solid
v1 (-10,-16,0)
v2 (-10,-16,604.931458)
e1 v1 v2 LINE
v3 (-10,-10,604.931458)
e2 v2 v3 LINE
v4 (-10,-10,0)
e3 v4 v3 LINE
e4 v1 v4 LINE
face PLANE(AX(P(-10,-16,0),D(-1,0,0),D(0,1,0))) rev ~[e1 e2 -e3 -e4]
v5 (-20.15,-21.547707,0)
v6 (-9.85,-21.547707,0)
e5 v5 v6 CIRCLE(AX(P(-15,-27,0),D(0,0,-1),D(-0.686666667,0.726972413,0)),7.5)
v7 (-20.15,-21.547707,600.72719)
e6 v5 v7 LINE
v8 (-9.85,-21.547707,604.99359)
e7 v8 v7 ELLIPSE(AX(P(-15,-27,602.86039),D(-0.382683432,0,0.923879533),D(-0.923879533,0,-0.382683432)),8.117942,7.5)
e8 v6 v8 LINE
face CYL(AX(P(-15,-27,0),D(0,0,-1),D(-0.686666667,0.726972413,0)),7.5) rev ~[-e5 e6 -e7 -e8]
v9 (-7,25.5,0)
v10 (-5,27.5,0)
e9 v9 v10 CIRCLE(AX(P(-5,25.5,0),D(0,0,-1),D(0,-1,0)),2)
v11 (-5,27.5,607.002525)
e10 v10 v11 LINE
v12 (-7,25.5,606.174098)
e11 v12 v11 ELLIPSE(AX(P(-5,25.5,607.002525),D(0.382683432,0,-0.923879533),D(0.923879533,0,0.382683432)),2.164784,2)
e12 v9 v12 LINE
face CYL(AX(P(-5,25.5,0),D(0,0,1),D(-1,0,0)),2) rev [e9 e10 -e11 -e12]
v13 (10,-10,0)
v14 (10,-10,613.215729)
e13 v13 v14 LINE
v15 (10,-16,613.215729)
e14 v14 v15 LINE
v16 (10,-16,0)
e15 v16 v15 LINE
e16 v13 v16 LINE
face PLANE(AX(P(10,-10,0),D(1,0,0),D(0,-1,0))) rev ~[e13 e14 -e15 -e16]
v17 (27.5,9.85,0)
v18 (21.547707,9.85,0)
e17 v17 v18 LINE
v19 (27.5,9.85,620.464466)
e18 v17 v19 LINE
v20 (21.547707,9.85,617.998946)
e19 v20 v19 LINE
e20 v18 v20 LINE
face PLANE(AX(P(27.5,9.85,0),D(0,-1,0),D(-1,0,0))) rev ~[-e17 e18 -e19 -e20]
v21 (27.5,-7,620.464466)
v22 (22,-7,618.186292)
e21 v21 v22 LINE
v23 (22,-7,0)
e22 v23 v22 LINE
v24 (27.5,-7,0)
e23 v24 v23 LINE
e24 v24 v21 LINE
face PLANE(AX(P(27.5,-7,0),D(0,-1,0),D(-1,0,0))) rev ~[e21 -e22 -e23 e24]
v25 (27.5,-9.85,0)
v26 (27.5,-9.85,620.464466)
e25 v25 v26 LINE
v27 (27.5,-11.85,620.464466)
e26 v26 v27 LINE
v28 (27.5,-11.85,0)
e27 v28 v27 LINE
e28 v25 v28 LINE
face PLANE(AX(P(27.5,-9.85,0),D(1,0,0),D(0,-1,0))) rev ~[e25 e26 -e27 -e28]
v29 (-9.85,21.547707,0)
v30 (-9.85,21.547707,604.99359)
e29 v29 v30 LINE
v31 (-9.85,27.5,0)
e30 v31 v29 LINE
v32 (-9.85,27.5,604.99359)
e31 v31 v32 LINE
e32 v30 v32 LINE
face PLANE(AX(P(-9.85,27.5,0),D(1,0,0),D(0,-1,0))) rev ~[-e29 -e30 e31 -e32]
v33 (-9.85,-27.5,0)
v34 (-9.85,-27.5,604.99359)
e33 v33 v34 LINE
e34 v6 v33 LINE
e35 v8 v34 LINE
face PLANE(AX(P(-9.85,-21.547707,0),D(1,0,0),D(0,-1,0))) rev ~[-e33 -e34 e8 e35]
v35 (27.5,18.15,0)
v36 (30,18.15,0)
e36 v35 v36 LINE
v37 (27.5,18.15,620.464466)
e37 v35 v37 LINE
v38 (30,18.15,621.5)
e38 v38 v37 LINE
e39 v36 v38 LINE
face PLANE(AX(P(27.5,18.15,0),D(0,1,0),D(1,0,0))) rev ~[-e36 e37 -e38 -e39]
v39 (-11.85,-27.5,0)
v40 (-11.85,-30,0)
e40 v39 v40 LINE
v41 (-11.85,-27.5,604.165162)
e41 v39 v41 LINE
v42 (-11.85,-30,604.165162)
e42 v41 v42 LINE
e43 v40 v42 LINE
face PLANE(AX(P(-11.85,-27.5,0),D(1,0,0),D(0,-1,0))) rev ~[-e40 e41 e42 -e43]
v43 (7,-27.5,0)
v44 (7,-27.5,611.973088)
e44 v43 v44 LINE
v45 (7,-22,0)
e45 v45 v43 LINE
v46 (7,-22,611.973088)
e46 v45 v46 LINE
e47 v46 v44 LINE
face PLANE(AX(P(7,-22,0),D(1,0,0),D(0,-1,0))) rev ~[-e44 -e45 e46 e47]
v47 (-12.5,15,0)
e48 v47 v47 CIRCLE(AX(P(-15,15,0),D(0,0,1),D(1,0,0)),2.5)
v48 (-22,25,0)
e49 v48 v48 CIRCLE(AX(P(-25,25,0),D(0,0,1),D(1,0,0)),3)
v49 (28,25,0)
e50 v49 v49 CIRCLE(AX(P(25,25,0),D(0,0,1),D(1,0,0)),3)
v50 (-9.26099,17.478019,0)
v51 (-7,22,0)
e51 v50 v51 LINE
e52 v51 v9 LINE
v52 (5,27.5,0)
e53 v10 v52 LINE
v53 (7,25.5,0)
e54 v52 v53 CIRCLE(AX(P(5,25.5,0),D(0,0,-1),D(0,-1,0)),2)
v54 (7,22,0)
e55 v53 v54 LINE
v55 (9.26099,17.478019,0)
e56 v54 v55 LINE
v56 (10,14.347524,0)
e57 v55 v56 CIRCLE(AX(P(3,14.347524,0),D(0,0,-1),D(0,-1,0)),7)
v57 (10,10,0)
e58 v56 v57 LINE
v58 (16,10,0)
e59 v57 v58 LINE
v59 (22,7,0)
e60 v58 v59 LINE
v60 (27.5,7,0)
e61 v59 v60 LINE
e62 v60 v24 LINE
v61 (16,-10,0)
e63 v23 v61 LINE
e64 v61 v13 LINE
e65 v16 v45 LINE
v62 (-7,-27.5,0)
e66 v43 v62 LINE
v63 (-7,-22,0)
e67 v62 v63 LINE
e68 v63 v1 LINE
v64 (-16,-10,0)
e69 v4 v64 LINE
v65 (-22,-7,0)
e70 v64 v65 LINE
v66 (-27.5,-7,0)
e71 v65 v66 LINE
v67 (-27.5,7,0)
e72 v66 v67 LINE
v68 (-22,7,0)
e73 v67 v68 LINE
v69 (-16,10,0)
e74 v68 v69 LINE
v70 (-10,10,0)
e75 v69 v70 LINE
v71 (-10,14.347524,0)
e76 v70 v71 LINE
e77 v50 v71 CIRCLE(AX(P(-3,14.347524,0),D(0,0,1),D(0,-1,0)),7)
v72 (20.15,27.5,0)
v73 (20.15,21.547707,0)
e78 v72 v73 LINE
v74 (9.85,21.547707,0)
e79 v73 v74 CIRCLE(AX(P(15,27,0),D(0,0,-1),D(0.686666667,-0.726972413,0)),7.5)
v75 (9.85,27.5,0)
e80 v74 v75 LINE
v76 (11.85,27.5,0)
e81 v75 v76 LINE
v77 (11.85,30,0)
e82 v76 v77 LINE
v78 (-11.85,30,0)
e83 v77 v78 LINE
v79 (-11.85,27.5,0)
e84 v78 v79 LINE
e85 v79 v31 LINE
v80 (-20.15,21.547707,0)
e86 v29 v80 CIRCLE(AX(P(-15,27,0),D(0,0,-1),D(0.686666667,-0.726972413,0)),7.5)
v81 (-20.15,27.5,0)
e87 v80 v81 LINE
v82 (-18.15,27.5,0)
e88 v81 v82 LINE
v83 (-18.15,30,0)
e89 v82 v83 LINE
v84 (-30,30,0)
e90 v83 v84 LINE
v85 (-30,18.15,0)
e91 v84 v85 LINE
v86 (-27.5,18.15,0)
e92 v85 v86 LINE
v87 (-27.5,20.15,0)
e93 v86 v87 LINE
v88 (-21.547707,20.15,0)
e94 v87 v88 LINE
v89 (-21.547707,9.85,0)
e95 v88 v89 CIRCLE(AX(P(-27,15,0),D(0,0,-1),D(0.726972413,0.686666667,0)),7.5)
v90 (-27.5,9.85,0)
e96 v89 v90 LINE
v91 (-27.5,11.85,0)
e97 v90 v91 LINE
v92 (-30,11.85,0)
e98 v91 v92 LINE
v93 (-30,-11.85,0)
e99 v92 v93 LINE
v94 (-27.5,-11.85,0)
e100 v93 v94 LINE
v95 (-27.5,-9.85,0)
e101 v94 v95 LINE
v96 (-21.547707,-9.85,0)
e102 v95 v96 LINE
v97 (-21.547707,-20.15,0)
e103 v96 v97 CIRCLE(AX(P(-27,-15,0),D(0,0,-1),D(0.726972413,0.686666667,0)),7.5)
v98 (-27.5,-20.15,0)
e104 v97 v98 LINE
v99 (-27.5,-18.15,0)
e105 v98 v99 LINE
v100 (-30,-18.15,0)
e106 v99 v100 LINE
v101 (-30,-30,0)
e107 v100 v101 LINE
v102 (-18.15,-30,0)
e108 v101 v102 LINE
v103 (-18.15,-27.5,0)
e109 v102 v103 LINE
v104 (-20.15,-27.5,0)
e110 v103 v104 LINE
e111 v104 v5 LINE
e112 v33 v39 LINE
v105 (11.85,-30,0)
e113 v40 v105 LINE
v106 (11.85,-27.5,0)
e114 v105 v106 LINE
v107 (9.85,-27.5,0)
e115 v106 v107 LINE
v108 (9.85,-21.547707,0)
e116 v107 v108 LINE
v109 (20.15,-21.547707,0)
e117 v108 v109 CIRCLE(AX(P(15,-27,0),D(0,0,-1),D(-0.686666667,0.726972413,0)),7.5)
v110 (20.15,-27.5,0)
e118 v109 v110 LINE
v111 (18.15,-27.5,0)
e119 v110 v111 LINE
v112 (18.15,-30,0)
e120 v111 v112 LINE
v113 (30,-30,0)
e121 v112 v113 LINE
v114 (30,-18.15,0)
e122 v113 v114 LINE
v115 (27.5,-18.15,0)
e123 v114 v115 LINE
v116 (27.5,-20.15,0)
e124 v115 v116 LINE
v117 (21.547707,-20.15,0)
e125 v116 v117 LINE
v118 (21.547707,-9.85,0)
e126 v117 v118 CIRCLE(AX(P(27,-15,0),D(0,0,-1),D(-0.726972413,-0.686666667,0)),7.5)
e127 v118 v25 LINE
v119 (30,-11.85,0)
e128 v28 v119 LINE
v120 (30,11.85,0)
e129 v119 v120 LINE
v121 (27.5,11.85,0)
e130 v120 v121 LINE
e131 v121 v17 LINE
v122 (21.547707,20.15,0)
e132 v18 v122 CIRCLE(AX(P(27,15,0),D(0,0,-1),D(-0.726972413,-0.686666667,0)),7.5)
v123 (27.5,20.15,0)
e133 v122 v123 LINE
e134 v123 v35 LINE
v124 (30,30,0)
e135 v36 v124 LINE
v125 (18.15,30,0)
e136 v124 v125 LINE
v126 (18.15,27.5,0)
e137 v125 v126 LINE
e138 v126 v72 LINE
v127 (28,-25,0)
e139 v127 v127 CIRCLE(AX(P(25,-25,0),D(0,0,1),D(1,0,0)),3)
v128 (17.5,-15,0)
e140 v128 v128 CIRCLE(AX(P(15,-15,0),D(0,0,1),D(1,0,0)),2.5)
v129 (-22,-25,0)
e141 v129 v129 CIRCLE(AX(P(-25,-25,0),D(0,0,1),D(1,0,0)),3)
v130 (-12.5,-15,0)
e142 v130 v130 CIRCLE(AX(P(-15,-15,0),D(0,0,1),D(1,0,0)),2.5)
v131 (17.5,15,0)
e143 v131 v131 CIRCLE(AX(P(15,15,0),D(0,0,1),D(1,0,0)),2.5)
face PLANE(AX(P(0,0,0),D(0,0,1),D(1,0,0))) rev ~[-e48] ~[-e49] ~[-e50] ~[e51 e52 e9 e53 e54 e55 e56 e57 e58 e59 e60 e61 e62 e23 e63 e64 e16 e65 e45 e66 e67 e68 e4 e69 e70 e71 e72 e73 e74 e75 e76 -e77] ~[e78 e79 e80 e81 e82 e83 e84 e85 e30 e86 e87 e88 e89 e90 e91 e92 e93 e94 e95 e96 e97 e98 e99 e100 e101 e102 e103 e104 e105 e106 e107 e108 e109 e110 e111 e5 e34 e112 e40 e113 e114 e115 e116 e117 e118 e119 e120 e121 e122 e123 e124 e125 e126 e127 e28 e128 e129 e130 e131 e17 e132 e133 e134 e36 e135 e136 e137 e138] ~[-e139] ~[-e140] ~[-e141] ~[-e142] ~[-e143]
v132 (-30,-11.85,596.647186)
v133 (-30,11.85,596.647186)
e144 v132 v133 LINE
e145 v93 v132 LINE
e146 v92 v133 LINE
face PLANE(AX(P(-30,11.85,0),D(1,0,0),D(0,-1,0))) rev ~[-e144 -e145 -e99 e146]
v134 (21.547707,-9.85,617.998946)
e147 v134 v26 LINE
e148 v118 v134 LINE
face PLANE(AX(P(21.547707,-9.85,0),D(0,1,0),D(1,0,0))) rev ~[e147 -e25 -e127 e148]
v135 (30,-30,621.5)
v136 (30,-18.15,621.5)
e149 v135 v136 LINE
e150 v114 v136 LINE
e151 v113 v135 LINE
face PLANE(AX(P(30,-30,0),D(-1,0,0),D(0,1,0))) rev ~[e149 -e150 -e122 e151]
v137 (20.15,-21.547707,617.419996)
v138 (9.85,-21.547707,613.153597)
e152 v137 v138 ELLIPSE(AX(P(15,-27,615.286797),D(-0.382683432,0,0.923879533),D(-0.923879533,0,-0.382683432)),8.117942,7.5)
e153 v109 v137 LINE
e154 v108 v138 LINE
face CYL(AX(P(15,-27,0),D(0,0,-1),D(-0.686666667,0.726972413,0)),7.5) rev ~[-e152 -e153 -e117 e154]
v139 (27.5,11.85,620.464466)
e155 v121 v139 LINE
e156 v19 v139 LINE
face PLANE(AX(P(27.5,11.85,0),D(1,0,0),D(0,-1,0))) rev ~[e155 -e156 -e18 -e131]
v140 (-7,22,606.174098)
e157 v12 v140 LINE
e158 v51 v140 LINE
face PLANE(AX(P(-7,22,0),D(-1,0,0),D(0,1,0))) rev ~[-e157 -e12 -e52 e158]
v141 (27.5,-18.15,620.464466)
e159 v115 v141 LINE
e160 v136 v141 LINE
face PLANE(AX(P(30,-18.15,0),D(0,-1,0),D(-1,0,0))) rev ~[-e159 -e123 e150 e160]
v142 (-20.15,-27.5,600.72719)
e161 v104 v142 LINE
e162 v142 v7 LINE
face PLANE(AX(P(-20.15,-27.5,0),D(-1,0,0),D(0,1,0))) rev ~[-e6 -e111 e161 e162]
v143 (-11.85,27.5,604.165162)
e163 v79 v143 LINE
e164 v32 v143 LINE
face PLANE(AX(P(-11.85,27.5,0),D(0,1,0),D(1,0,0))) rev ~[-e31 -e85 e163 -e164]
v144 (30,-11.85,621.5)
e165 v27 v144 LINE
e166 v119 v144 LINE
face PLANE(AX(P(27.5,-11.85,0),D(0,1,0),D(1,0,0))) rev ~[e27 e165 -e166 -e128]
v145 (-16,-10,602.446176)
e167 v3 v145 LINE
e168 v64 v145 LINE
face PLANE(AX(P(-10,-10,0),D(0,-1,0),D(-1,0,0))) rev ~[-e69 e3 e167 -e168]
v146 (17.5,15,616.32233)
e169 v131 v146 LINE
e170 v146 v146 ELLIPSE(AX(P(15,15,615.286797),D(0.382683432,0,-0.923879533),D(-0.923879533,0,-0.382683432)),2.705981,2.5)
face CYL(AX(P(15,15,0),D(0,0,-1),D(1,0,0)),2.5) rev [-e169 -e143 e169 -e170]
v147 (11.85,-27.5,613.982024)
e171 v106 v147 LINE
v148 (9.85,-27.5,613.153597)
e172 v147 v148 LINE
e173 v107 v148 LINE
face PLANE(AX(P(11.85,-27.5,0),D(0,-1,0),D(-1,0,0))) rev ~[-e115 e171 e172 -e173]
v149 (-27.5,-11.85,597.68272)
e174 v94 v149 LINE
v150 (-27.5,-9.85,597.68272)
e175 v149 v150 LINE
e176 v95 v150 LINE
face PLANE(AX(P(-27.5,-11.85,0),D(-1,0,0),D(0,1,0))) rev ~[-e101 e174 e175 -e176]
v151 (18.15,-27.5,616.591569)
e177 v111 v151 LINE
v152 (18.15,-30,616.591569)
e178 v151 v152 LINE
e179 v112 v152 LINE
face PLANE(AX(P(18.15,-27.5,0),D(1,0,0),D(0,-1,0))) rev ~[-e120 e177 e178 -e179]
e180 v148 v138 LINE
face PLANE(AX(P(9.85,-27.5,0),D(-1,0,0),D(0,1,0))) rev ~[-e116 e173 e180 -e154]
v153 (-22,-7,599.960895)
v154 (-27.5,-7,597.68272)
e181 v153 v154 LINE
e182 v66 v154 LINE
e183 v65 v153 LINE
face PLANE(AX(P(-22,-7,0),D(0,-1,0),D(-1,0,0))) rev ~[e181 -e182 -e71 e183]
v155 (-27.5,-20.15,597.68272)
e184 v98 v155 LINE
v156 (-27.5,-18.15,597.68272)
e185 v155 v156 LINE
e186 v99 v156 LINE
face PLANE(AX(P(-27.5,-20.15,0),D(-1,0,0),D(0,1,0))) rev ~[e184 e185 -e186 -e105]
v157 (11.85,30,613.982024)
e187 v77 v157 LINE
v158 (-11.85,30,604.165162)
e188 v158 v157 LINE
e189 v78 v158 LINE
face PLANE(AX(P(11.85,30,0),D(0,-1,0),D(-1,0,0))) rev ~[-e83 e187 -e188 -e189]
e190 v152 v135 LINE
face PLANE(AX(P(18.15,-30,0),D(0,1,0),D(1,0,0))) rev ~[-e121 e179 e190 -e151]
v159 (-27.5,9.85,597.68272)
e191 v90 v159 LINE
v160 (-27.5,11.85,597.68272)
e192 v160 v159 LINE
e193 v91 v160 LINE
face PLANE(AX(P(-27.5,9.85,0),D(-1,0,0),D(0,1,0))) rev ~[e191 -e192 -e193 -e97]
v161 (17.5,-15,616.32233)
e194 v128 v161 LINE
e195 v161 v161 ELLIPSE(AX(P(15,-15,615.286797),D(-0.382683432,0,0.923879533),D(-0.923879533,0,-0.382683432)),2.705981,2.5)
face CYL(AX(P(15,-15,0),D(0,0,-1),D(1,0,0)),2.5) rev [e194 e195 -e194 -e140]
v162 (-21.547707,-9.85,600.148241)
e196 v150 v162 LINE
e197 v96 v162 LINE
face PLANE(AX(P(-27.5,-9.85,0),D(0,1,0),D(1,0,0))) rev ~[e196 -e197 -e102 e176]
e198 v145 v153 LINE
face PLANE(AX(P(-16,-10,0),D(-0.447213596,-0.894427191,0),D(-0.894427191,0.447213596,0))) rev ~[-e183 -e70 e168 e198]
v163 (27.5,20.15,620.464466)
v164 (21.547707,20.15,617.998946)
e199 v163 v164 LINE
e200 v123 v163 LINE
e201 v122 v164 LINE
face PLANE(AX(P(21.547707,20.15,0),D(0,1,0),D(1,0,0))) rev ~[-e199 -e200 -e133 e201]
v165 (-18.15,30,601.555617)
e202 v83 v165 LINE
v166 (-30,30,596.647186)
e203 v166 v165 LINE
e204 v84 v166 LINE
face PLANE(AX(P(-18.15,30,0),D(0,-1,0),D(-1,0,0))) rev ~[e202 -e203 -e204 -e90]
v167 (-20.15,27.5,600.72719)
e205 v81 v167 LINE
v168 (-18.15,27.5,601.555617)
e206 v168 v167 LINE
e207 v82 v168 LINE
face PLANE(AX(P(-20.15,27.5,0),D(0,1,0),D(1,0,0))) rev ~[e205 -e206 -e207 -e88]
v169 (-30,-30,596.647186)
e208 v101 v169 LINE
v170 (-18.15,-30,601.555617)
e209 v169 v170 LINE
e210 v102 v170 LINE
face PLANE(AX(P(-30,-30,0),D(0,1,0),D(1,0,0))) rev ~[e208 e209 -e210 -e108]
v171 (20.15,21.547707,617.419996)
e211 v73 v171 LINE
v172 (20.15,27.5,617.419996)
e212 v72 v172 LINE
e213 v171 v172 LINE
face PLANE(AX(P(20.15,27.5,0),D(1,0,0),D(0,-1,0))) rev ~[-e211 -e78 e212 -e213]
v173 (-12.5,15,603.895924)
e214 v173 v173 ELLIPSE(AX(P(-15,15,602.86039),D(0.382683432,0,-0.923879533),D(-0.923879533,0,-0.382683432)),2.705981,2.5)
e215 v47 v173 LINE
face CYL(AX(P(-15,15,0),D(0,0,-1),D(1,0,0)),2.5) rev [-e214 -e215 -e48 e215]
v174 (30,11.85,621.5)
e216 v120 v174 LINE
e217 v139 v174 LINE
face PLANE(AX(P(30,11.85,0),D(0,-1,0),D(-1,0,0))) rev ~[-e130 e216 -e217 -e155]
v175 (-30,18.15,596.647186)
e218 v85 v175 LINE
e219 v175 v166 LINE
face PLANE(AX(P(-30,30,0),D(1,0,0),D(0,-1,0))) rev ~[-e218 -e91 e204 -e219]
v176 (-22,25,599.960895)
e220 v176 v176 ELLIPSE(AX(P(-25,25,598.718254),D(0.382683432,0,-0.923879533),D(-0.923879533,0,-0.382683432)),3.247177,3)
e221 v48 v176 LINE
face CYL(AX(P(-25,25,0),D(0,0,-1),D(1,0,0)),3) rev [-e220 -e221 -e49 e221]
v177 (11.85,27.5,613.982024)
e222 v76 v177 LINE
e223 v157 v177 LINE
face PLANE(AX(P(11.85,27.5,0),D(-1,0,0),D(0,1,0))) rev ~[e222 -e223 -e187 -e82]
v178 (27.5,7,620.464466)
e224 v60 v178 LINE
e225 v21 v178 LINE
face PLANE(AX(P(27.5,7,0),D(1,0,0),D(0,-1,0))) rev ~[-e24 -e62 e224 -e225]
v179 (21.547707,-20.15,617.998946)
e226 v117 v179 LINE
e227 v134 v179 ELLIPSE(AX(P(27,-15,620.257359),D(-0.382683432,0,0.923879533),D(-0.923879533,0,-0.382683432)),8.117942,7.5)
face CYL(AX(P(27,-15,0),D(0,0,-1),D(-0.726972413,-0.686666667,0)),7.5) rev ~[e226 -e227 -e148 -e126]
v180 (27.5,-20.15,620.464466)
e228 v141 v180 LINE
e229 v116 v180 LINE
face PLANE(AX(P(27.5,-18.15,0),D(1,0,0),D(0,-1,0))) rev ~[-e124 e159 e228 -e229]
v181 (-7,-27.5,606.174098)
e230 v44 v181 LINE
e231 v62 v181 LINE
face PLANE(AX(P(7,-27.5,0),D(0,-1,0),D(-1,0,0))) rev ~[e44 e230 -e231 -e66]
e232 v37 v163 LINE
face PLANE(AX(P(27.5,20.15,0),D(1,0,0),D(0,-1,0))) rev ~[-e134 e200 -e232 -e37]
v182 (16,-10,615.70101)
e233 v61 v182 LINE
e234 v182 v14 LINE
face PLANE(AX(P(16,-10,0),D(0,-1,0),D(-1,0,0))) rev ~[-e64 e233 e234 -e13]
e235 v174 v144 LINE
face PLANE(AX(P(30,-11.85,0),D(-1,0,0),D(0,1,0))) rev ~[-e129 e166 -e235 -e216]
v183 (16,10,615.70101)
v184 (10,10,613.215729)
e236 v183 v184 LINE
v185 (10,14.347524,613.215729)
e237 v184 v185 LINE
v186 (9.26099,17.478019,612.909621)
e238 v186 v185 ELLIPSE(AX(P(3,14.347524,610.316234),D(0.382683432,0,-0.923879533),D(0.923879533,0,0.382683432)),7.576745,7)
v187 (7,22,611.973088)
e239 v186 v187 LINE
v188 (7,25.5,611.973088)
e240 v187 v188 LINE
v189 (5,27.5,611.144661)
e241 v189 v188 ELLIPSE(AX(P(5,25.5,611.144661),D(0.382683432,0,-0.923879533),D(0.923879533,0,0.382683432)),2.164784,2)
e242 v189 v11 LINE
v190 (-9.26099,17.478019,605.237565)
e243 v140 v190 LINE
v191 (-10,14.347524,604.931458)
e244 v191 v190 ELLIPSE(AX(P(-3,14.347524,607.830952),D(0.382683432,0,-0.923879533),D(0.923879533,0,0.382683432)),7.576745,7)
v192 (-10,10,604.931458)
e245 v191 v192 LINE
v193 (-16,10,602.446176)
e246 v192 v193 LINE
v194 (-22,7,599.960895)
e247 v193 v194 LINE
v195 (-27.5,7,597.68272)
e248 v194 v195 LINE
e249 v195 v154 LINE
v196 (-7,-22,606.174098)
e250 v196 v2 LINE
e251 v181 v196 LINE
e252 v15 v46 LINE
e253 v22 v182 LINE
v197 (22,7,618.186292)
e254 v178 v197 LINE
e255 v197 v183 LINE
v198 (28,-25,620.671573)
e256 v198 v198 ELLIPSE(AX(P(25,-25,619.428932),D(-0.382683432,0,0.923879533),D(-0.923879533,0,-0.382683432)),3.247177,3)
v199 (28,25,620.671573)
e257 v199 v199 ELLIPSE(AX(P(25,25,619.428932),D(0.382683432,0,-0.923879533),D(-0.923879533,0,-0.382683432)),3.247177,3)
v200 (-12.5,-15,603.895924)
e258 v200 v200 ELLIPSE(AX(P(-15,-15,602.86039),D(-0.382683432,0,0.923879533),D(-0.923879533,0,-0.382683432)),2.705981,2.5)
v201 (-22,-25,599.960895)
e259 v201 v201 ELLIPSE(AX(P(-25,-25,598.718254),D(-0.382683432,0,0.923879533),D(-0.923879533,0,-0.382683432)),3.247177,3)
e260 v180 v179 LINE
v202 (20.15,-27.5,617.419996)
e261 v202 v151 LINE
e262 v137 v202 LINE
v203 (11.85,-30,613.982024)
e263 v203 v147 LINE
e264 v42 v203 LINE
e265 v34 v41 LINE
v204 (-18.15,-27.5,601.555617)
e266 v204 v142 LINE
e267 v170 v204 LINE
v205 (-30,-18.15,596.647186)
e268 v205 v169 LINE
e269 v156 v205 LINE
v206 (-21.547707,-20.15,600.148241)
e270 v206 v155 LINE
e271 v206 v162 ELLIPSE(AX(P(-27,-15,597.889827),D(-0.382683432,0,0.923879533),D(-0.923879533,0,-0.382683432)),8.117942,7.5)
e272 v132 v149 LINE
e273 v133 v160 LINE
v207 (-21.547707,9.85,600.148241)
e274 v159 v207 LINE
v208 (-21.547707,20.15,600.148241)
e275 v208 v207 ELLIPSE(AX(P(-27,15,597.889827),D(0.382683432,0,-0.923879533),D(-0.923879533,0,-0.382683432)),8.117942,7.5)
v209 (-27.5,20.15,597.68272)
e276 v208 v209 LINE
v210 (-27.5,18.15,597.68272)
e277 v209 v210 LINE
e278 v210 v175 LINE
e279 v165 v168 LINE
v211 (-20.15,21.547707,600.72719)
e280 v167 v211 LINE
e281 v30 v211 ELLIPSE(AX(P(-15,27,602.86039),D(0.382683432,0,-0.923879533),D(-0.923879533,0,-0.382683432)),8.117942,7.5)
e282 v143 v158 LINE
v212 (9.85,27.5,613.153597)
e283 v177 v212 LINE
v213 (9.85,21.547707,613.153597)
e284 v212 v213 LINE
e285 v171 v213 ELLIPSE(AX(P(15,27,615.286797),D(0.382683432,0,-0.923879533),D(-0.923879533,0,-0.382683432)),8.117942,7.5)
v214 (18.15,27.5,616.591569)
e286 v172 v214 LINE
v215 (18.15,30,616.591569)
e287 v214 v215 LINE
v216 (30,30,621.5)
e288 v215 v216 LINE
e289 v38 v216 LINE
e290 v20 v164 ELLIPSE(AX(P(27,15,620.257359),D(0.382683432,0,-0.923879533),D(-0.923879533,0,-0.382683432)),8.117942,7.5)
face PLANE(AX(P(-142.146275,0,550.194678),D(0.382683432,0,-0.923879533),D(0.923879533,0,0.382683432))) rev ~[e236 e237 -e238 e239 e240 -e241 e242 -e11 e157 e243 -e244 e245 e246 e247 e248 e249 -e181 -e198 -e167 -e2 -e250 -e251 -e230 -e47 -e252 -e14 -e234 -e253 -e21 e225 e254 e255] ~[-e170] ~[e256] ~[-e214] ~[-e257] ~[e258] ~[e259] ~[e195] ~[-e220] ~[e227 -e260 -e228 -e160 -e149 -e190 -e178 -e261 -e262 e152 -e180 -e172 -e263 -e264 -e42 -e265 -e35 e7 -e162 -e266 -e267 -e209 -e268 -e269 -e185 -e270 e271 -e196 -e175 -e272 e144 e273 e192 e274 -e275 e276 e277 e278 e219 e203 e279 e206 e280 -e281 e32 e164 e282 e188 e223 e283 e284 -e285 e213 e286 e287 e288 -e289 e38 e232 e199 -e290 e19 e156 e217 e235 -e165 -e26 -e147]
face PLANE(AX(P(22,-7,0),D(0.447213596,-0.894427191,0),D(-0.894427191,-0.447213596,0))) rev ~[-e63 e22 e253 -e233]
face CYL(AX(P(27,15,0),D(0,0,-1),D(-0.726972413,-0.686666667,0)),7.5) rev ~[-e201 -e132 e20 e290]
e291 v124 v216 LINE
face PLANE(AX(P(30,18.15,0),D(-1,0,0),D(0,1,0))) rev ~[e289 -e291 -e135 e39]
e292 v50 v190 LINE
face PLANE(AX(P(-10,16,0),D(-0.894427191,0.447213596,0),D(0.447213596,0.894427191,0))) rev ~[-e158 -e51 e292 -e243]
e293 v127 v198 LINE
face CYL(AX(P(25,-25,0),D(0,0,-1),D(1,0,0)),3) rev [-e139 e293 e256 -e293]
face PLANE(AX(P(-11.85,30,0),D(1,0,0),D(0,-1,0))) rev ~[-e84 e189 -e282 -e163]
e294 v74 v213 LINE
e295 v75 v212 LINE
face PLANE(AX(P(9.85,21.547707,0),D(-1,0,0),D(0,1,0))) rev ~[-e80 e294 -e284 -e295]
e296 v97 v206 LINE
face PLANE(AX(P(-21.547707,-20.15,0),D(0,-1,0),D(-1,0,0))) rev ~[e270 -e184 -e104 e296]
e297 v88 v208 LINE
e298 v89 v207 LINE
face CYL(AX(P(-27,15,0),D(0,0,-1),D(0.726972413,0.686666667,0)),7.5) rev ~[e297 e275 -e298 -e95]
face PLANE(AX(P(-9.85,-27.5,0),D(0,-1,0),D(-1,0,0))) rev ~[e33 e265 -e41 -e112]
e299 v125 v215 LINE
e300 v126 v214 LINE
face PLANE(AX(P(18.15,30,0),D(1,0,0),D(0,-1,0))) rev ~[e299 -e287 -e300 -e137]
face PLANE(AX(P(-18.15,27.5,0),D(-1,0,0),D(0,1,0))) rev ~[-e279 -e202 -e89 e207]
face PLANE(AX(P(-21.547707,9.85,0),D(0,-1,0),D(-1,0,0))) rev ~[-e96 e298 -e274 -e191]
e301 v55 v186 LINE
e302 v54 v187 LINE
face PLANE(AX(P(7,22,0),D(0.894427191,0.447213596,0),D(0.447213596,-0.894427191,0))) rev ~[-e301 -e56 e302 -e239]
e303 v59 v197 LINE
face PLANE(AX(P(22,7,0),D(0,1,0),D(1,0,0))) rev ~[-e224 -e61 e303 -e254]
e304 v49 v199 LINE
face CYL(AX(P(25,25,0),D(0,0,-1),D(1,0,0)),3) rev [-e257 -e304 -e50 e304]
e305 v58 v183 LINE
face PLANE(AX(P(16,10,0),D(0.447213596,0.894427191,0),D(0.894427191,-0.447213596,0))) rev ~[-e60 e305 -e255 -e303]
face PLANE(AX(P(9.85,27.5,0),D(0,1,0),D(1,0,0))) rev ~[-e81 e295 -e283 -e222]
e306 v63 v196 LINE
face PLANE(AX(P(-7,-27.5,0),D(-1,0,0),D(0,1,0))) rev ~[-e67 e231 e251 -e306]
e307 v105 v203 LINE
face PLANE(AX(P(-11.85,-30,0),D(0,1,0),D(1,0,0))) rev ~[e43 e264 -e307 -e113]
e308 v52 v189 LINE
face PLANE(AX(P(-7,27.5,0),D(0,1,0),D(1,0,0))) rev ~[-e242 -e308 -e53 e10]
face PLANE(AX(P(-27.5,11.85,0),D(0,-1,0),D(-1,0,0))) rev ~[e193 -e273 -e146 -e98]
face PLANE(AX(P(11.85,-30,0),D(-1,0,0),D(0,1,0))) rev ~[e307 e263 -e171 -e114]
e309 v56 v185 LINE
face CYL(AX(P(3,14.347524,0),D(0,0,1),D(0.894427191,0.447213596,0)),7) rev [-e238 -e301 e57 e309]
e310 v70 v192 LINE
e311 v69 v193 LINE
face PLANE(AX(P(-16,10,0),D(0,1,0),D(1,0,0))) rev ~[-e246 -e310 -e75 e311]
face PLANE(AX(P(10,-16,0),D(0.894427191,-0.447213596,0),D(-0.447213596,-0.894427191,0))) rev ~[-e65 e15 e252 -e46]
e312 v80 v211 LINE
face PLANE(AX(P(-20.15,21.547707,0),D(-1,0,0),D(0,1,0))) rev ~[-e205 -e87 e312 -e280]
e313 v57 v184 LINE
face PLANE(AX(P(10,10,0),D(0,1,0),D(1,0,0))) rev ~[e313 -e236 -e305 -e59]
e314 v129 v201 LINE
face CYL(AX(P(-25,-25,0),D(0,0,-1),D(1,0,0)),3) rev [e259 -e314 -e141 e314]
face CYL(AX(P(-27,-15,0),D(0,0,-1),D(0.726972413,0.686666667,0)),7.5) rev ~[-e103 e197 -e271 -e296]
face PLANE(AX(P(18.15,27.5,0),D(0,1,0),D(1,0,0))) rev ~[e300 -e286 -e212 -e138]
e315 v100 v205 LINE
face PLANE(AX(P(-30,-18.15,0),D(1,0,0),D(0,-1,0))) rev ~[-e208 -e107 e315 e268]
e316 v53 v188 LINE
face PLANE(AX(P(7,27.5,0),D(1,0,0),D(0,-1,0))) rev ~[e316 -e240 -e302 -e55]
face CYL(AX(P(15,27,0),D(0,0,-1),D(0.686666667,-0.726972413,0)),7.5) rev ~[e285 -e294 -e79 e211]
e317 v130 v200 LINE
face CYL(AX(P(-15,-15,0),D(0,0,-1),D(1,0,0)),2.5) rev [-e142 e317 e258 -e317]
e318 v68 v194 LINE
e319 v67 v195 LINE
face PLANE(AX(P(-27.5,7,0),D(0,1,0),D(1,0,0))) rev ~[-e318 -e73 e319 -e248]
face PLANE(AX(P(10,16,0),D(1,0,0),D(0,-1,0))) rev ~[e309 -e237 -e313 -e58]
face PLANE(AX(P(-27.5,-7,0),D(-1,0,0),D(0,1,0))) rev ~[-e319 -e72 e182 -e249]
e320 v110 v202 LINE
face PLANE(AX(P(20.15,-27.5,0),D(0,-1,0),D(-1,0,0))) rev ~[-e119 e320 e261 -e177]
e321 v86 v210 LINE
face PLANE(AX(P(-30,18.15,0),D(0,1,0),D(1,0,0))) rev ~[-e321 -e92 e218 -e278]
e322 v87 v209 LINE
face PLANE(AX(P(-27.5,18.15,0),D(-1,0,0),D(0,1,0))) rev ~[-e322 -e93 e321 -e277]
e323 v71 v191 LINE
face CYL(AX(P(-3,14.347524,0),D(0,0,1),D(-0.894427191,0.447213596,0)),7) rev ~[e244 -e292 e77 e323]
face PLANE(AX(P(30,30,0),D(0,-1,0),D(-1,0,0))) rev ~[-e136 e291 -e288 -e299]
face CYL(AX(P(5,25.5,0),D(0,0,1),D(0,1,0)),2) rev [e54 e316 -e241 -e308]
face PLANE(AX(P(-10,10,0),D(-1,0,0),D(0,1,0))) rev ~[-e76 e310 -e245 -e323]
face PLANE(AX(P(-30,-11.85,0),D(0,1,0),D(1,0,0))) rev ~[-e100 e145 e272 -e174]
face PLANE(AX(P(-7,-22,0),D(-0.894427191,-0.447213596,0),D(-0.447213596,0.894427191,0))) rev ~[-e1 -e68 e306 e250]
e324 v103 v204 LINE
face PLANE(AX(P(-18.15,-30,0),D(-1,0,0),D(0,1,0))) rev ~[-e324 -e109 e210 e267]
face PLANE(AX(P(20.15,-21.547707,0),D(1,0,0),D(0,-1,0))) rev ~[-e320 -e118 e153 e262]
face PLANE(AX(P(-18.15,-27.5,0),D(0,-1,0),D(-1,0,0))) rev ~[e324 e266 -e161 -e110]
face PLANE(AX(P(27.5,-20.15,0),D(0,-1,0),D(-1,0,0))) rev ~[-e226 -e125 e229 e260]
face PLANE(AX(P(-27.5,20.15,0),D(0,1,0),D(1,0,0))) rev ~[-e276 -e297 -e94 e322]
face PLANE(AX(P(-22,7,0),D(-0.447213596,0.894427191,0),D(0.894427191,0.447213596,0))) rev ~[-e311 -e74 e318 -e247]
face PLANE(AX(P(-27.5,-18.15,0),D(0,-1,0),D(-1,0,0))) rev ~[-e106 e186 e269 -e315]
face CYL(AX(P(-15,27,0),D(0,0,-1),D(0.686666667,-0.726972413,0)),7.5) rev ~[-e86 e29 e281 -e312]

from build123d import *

# Parameters (mm, degrees)
F0_R          = 3
F0_R_2        = 2.5
F1_DEPTH      = 621.5
F2_R          = 2
F3_R          = 7
F6_DEPTH      = 30
F6_DEPTH_BACK = 30


# Not quite as in the source:
# - a feature names something its author has since deleted; it is built from what else it names


with BuildPart() as f1:
    # F0 (on Top) → F1 (new body)
    with BuildSketch(Plane.XY):
        with BuildLine():
            Line((18.15, -30), (30, -30))
            Line((30, -30), (30, -18.15))
            Line((30, -18.15), (27.5, -18.15))
            Line((27.5, -18.15), (27.5, -20.15))
            Line((27.5, -20.15), (21.5477069044, -20.15))
            ThreePointArc((21.5477069044, -20.15), (19.5, -15), (21.5477069044, -9.85))
            Line((21.5477069044, -9.85), (27.5, -9.85))
            Line((27.5, -9.85), (27.5, -11.85))
            Line((27.5, -11.85), (30, -11.85))
            Line((30, -11.85), (30, 11.85))
            Line((30, 11.85), (27.5, 11.85))
            Line((27.5, 11.85), (27.5, 9.85))
            Line((27.5, 9.85), (21.5477069044, 9.85))
            ThreePointArc((21.5477069044, 9.85), (19.5, 15), (21.5477069044, 20.15))
            Line((21.5477069044, 20.15), (27.5, 20.15))
            Line((27.5, 20.15), (27.5, 18.15))
            Line((27.5, 18.15), (30, 18.15))
            Line((30, 18.15), (30, 30))
            Line((30, 30), (18.15, 30))
            Line((18.15, 30), (18.15, 27.5))
            Line((18.15, 27.5), (20.15, 27.5))
            Line((20.15, 27.5), (20.15, 21.5477069044))
            ThreePointArc((20.15, 21.5477069044), (15, 19.5), (9.85, 21.5477069044))
            Line((9.85, 21.5477069044), (9.85, 27.5))
            Line((9.85, 27.5), (11.85, 27.5))
            Line((11.85, 27.5), (11.85, 30))
            Line((11.85, 30), (-11.85, 30))
            Line((-11.85, 30), (-11.85, 27.5))
            Line((-11.85, 27.5), (-9.85, 27.5))
            Line((-9.85, 27.5), (-9.85, 21.5477069044))
            ThreePointArc((-9.85, 21.5477069044), (-15, 19.5), (-20.15, 21.5477069044))
            Line((-20.15, 21.5477069044), (-20.15, 27.5))
            Line((-20.15, 27.5), (-18.15, 27.5))
            Line((-18.15, 27.5), (-18.15, 30))
            Line((-18.15, 30), (-30, 30))
            Line((-30, 30), (-30, 18.15))
            Line((-30, 18.15), (-27.5, 18.15))
            Line((-27.5, 18.15), (-27.5, 20.15))
            Line((-27.5, 20.15), (-21.5477069044, 20.15))
            ThreePointArc((-21.5477069044, 20.15), (-19.5, 15), (-21.5477069044, 9.85))
            Line((-21.5477069044, 9.85), (-27.5, 9.85))
            Line((-27.5, 9.85), (-27.5, 11.85))
            Line((-27.5, 11.85), (-30, 11.85))
            Line((-30, 11.85), (-30, -11.85))
            Line((-30, -11.85), (-27.5, -11.85))
            Line((-27.5, -11.85), (-27.5, -9.85))
            Line((-27.5, -9.85), (-21.5477069044, -9.85))
            ThreePointArc((-21.5477069044, -9.85), (-19.5, -15), (-21.5477069044, -20.15))
            Line((-21.5477069044, -20.15), (-27.5, -20.15))
            Line((-27.5, -20.15), (-27.5, -18.15))
            Line((-27.5, -18.15), (-30, -18.15))
            Line((-30, -18.15), (-30, -30))
            Line((-30, -30), (-18.15, -30))
            Line((-18.15, -30), (-18.15, -27.5))
            Line((-18.15, -27.5), (-20.15, -27.5))
            Line((-20.15, -27.5), (-20.15, -21.5477069044))
            ThreePointArc((-20.15, -21.5477069044), (-15, -19.5), (-9.85, -21.5477069044))
            Line((-9.85, -21.5477069044), (-9.85, -27.5))
            Line((-9.85, -27.5), (-11.85, -27.5))
            Line((-11.85, -27.5), (-11.85, -30))
            Line((-11.85, -30), (11.85, -30))
            Line((11.85, -30), (11.85, -27.5))
            Line((11.85, -27.5), (9.85, -27.5))
            Line((9.85, -27.5), (9.85, -21.5477069044))
            ThreePointArc((9.85, -21.5477069044), (15, -19.5), (20.15, -21.5477069044))
            Line((20.15, -21.5477069044), (20.15, -27.5))
            Line((20.15, -27.5), (18.15, -27.5))
            Line((18.15, -27.5), (18.15, -30))
        make_face()
        with Locations((-25, -25)):
            Circle(F0_R, mode=Mode.SUBTRACT)
        with Locations((-15, -15)):
            Circle(F0_R_2, mode=Mode.SUBTRACT)
        with Locations((25, -25)):
            Circle(F0_R, mode=Mode.SUBTRACT)
        with Locations((15, -15)):
            Circle(F0_R_2, mode=Mode.SUBTRACT)
        with Locations((-25, 25)):
            Circle(F0_R, mode=Mode.SUBTRACT)
        with Locations((-15, 15)):
            Circle(F0_R_2, mode=Mode.SUBTRACT)
        Polygon((-7, 22), (-7, 27.5), (0, 27.5), (7, 27.5), (7, 22), (10, 16), (10, 10), (16, 10), (22, 7), (27.5, 7), (27.5, 0), (27.5, -7), (22, -7), (16, -10), (10, -10), (10, -16), (7, -22), (7, -27.5), (0, -27.5), (-7, -27.5), (-7, -22), (-10, -16), (-10, -10), (-16, -10), (-22, -7), (-27.5, -7), (-27.5, 0), (-27.5, 7), (-22, 7), (-16, 10), (-10, 10), (-10, 16), align=None, mode=Mode.SUBTRACT)
        with Locations((15, 15)):
            Circle(F0_R_2, mode=Mode.SUBTRACT)
        with Locations((25, 25)):
            Circle(F0_R, mode=Mode.SUBTRACT)
    extrude(amount=F1_DEPTH)

    # F2
    f2_edges = [f1.edges().sort_by_distance(p)[0] for p in [
        (-7, 27.5, 310.75),
        (7, 27.5, 310.75),
    ]]
    fillet(f2_edges, radius=F2_R)

    # F3
    f3_edges = [f1.edges().sort_by_distance(p)[0] for p in [
        (-10, 16, 310.75),
        (10, 16, 310.75),
    ]]
    fillet(f3_edges, radius=F3_R)

    # F5 (on Front) → F6 (cut, two sides)
    with BuildSketch(Plane.XZ) as f6_sk:
        Polygon((30, 621.5), (-11.184961555, 720.929292752), (-183.3312368923, 649.6239707953), (-142.1462753372, 550.1946780433), align=None)
    extrude(amount=F6_DEPTH, mode=Mode.SUBTRACT)
    extrude(f6_sk.sketch, amount=-F6_DEPTH_BACK, mode=Mode.SUBTRACT)


solid = f1.part
